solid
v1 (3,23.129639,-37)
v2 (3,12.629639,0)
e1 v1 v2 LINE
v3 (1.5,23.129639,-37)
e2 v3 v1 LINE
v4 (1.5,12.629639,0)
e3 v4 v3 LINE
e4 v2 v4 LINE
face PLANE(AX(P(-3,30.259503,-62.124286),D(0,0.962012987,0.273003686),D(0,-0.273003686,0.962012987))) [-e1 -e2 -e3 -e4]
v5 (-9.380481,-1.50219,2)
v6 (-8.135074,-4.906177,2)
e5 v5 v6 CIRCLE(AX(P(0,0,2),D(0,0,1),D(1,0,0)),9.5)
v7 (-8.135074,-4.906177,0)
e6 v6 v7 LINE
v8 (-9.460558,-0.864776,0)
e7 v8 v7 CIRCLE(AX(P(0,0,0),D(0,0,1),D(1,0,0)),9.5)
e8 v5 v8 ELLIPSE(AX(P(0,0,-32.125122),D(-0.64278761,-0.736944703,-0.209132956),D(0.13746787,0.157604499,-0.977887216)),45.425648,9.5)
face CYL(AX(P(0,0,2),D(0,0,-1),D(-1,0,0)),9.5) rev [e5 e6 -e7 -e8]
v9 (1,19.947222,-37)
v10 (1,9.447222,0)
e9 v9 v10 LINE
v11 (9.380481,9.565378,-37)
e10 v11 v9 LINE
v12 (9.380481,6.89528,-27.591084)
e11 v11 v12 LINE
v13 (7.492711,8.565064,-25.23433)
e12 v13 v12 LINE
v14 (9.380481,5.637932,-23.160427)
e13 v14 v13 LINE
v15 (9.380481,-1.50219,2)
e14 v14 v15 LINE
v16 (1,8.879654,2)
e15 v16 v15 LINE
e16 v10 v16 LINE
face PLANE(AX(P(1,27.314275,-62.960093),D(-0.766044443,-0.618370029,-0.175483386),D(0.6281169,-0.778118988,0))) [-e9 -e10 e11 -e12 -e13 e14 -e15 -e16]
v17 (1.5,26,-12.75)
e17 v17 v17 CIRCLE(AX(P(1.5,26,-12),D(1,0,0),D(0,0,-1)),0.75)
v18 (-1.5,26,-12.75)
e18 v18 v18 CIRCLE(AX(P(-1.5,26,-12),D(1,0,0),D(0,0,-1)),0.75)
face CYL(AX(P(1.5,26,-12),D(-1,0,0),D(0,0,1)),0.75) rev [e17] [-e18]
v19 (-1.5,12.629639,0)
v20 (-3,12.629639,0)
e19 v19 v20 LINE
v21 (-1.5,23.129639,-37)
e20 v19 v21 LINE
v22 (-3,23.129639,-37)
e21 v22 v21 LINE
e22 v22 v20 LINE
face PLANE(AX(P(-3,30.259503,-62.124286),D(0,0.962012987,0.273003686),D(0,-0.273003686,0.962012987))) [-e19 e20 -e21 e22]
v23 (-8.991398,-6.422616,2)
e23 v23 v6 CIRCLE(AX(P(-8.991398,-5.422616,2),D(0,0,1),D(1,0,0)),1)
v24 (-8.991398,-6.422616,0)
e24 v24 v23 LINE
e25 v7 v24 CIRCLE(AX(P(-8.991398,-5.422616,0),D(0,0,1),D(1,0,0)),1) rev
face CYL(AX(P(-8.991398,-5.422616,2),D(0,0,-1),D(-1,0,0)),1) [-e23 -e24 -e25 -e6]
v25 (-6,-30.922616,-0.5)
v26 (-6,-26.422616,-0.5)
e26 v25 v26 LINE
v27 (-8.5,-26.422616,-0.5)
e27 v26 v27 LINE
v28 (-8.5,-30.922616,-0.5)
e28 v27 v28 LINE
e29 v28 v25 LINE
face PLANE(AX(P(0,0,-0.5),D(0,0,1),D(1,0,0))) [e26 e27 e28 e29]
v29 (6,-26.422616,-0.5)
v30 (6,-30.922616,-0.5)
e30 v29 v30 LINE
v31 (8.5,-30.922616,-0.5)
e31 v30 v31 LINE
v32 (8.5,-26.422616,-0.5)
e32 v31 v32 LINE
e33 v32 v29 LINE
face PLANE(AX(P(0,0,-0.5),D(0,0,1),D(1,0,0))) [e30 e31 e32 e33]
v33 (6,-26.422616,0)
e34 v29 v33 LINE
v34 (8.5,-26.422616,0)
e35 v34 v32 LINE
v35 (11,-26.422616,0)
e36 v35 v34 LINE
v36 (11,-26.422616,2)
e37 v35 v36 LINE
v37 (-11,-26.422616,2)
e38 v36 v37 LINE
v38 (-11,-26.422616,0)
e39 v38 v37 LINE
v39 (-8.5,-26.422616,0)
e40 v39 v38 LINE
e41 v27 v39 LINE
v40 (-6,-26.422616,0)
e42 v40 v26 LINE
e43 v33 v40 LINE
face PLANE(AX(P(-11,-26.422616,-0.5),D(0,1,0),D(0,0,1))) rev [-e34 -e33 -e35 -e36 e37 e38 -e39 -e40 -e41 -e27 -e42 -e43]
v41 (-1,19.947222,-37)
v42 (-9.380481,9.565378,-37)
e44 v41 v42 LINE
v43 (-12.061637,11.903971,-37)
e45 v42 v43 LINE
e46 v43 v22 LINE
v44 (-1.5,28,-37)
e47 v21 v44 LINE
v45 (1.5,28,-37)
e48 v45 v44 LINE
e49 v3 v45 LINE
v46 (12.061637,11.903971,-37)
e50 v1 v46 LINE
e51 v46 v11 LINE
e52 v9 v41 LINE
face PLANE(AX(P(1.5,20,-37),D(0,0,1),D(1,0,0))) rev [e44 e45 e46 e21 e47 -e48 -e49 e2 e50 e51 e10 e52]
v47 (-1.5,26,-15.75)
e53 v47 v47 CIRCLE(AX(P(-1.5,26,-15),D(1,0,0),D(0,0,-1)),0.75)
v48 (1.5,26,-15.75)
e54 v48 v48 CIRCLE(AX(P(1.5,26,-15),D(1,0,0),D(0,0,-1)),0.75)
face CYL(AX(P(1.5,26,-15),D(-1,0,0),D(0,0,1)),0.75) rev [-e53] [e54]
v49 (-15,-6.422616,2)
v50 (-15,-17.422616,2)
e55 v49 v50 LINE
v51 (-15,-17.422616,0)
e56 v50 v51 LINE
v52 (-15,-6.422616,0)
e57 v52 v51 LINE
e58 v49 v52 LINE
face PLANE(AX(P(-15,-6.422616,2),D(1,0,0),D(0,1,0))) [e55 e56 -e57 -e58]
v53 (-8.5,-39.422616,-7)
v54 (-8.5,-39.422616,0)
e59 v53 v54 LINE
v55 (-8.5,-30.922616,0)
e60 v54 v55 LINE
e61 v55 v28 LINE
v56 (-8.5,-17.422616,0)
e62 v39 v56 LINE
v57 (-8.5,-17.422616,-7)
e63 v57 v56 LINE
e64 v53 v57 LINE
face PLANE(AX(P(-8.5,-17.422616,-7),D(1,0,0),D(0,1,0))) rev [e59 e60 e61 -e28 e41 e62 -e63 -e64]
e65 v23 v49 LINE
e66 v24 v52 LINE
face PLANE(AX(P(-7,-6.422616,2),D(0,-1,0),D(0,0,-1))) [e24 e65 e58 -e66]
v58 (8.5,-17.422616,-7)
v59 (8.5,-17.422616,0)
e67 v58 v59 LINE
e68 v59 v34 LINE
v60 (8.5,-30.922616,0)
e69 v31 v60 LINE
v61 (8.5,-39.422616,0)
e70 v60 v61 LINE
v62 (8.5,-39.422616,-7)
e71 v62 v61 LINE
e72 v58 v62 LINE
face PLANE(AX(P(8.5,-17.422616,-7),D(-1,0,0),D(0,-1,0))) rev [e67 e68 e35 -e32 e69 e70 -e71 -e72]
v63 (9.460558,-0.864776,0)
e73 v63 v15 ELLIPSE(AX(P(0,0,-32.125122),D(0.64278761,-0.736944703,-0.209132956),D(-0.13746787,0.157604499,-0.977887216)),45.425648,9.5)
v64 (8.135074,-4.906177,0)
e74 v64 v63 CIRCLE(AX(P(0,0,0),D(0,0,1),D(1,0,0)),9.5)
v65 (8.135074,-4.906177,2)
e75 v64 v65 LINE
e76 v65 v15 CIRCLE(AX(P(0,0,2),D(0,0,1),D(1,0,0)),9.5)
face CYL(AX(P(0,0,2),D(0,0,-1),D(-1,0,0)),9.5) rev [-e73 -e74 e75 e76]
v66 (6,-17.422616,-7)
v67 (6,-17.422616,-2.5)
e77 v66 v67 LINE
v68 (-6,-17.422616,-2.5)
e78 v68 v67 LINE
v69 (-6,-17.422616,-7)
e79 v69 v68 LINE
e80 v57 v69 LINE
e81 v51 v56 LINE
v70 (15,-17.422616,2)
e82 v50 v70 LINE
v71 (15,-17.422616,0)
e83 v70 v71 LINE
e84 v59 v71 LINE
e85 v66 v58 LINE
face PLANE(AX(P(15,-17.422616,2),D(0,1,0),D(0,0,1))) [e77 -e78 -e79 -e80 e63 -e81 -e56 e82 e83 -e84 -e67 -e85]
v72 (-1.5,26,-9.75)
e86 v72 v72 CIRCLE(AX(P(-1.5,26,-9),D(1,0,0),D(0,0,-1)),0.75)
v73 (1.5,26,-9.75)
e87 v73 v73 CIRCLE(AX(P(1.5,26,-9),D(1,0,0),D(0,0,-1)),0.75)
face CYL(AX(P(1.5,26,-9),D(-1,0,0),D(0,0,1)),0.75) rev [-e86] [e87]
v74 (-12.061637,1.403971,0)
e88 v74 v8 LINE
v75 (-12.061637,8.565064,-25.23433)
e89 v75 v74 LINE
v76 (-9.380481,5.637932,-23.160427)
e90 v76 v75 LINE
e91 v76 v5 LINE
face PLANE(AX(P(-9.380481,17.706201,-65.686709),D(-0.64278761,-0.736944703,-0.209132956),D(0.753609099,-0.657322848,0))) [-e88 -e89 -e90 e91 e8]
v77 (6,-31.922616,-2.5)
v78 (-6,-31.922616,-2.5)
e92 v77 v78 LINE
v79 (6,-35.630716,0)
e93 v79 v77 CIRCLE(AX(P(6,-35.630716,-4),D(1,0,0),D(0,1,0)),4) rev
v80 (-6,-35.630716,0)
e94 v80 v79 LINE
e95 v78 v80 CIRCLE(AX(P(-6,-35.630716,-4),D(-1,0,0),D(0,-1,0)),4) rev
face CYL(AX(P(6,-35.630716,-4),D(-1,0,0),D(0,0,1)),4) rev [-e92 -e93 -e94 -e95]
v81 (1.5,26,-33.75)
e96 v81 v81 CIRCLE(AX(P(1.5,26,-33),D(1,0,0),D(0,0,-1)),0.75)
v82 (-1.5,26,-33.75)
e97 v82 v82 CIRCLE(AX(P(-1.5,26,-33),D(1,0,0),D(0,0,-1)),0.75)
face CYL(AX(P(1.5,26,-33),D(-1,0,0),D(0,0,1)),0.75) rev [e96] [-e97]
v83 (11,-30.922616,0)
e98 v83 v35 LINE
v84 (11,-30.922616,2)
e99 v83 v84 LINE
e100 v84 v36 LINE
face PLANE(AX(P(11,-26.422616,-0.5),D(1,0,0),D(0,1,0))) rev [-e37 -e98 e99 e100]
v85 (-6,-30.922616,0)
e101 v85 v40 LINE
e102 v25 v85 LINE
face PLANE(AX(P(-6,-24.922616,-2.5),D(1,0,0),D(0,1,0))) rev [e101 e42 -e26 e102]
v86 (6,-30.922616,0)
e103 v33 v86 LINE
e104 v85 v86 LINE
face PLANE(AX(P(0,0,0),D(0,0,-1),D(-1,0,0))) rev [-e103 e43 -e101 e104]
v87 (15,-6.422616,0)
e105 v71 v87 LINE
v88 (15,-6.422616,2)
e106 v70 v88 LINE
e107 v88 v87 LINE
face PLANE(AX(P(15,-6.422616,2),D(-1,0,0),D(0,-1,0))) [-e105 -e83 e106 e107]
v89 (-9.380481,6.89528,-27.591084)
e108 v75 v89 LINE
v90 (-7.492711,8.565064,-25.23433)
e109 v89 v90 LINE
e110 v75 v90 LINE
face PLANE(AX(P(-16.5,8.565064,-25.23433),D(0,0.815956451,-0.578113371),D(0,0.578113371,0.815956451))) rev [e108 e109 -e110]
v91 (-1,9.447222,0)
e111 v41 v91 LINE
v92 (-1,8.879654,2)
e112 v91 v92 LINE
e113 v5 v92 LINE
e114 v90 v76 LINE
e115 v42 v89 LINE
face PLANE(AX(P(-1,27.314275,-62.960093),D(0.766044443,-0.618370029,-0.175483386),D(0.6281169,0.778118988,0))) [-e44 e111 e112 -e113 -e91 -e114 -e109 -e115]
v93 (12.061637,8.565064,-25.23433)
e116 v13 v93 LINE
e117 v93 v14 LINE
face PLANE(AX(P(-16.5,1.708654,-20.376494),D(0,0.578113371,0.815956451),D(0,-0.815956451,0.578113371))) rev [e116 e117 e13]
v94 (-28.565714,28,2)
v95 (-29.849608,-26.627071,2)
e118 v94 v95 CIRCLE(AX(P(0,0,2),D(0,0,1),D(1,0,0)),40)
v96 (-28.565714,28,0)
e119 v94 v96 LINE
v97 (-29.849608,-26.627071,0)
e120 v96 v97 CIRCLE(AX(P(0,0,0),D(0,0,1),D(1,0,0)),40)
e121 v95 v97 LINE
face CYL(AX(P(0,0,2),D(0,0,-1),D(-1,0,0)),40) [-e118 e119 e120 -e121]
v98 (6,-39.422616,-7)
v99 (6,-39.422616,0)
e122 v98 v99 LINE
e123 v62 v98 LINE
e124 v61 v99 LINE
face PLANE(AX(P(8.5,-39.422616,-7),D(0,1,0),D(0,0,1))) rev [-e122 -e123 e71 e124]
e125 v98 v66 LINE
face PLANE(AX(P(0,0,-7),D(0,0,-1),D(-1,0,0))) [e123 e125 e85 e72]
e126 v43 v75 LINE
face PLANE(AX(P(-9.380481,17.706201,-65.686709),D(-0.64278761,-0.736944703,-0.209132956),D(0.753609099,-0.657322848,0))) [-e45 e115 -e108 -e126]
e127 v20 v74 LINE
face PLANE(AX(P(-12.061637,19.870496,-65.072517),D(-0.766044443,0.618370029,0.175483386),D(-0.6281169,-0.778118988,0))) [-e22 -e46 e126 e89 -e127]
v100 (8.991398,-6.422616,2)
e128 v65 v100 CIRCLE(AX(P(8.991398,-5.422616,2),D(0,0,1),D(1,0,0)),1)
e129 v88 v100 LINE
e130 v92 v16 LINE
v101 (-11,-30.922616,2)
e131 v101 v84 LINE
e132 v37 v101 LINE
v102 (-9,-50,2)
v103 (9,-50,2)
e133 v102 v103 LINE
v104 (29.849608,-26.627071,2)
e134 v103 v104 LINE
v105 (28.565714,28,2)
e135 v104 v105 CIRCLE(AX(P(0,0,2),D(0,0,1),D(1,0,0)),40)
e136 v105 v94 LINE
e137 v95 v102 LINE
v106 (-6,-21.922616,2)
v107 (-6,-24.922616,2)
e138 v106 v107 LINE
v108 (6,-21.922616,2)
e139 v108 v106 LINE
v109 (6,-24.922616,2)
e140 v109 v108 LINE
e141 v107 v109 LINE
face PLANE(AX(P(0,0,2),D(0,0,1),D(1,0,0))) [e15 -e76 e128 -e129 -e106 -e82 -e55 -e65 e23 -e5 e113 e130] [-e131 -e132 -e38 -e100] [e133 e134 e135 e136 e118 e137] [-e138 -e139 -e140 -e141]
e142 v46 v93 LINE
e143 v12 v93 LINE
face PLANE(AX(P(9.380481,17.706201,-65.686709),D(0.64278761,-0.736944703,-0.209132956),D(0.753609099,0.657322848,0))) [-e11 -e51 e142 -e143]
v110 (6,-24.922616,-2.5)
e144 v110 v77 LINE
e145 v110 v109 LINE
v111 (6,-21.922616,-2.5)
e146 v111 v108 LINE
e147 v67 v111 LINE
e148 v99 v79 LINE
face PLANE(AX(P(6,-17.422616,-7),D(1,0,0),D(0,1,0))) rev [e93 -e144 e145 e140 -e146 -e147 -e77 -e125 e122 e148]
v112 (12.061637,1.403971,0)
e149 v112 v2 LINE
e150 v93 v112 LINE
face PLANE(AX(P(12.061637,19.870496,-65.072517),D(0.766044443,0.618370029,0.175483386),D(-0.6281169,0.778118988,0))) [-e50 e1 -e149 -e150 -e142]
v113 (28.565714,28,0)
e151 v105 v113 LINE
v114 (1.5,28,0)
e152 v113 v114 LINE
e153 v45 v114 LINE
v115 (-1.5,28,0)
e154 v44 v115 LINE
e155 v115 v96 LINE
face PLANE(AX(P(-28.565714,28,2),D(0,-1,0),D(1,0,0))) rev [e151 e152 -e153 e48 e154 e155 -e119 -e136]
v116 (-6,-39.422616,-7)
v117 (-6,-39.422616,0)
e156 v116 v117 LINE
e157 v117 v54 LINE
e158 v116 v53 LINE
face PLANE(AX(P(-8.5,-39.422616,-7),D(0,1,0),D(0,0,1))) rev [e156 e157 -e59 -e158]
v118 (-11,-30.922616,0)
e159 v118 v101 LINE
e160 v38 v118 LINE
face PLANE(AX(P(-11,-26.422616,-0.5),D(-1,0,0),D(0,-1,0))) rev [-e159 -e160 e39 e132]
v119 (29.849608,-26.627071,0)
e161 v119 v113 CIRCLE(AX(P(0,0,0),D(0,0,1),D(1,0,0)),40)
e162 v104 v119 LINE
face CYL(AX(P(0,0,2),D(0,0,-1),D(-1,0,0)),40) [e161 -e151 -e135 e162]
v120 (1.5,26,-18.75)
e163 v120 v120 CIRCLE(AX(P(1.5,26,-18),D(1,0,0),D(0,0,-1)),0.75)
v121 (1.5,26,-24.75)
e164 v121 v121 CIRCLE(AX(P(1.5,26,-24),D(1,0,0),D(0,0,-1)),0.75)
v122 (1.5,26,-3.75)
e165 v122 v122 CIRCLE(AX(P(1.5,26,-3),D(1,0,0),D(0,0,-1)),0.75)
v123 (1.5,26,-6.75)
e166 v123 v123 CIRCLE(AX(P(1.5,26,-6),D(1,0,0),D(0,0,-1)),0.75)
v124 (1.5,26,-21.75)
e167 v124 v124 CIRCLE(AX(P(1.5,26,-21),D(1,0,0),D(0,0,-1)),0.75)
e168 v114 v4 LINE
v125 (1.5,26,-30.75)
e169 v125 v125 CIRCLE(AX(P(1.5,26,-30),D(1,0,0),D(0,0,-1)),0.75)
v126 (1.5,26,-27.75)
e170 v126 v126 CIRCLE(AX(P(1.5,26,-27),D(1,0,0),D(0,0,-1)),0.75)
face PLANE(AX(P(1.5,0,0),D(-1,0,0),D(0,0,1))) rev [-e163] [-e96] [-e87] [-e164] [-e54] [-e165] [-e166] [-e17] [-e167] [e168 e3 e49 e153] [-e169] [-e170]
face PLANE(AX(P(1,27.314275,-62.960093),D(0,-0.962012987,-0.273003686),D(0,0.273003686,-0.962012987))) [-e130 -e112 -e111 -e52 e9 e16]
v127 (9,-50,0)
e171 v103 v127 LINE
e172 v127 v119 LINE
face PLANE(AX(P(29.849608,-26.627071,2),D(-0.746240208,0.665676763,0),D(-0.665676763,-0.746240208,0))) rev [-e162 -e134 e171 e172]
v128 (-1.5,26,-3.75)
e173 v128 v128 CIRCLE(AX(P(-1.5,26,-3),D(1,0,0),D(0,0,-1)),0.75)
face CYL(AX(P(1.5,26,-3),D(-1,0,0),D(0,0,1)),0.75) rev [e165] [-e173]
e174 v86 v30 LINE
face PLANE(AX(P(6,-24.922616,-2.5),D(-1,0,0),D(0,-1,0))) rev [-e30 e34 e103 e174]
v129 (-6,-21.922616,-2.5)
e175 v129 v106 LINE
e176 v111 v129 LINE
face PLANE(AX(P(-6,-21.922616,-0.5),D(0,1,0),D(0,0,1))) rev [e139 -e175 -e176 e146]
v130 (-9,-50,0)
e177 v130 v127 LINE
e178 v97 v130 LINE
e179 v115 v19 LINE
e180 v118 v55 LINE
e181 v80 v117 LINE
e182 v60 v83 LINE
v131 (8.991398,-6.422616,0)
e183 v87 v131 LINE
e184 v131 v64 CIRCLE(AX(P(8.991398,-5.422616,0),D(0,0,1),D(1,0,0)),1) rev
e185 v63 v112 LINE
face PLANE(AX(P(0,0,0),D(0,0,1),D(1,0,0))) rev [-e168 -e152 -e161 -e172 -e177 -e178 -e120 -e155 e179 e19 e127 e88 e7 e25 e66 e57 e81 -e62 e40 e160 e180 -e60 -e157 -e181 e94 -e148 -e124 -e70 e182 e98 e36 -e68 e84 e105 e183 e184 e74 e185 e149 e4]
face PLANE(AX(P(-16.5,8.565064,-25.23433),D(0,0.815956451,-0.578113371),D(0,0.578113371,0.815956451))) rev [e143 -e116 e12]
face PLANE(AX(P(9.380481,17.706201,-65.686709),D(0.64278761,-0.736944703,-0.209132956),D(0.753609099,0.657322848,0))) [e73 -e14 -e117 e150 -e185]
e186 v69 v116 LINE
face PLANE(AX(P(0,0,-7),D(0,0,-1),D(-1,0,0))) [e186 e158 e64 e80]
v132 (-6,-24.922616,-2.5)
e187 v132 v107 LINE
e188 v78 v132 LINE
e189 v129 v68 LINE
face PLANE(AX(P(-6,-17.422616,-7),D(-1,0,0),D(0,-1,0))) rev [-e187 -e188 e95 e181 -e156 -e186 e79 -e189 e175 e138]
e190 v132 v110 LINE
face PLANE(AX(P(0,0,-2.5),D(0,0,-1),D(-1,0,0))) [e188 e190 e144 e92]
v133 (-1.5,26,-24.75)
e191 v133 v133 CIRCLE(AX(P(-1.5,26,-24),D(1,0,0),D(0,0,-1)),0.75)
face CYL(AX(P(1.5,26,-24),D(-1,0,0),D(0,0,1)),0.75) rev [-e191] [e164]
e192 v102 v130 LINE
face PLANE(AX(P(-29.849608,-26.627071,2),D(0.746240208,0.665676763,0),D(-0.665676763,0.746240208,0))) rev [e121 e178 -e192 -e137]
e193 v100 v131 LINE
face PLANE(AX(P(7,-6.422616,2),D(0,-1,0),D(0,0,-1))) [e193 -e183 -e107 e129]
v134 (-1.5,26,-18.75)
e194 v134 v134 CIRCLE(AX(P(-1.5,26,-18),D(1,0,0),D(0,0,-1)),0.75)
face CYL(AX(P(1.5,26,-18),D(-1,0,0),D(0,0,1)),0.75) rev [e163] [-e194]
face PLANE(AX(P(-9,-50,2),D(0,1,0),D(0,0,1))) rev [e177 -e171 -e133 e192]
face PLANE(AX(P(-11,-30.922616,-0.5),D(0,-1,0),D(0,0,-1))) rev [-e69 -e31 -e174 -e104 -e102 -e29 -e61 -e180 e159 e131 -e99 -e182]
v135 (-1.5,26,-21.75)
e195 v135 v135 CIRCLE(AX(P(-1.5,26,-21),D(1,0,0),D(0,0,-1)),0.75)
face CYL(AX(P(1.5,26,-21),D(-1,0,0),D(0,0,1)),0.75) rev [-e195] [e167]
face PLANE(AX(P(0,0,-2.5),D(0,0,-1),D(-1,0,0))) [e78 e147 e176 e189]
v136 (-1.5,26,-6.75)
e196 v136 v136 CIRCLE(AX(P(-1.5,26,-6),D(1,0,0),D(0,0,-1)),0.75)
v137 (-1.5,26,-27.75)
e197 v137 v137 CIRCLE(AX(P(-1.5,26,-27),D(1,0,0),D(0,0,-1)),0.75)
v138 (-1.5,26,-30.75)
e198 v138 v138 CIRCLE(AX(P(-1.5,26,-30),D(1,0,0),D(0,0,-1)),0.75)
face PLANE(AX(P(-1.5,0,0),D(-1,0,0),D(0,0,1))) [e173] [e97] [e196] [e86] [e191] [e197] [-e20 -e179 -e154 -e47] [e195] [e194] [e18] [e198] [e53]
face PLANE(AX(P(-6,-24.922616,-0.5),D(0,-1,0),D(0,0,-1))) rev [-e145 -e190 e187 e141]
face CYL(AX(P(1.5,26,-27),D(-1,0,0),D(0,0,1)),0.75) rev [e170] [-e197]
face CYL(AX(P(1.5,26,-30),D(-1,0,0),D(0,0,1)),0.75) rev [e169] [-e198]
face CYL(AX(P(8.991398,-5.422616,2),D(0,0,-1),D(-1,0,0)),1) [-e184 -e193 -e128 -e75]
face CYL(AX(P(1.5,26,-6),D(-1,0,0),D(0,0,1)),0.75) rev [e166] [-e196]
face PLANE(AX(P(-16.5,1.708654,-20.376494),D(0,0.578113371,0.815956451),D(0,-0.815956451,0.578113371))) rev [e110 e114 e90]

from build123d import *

# Parameters (mm, degrees)
BOSS_EXTRUDE1_DEPTH             = 2
SKETCH2_R                       = 0.75
BOSS_EXTRUDE2_DEPTH             = 1.5
BOSS_EXTRUDE3_REACH             = 75.225
BOSS_EXTRUDE3_DIRECTION_2_REACH = 75.225
CUT_EXTRUDE1_DEPTH              = 16.5
SKETCH5_W                       = 2.5
SKETCH5_H                       = 22
BOSS_EXTRUDE4_DEPTH             = 7
SKETCH6_W                       = 12
SKETCH6_H                       = 3
SKETCH6_W_2                     = 22
SKETCH6_H_2                     = 4.5
CUT_EXTRUDE2_DEPTH              = 2.5
SKETCH7_W                       = 12
SKETCH7_H                       = 7
SKETCH7_H_2                     = 4.5
BOSS_EXTRUDE5_DEPTH             = 2.5
FILLET1_R                       = 4
FILLET2_R                       = 1


with BuildPart() as part:
    # Sketch1 → Boss-Extrude1 (new body)
    with BuildSketch(Plane.XY):
        with BuildLine():
            Line((-28.565713714, 28), (28.565713714, 28))
            ThreePointArc((28.565713714, 28), (39.988956848, 0.93985647), (29.849608312, -26.627070504))
            Line((29.849608312, -26.627070504), (9, -50))
            Line((9, -50), (-9, -50))
            Line((-9, -50), (-29.849608312, -26.627070504))
            ThreePointArc((-29.849608312, -26.627070504), (-39.988956848, 0.93985647), (-28.565713714, 28))
        make_face()
        with BuildLine():
            Line((7, -6.422616289), (15, -6.422616289))
            Line((15, -6.422616289), (15, -17.422616289))
            Line((15, -17.422616289), (-15, -17.422616289))
            Line((-15, -17.422616289), (-15, -6.422616289))
            Line((-15, -6.422616289), (-7, -6.422616289))
            ThreePointArc((-7, -6.422616289), (0, 9.5), (7, -6.422616289))
        make_face(mode=Mode.SUBTRACT)
    extrude(amount=BOSS_EXTRUDE1_DEPTH)

    # Sketch2 → Boss-Extrude2 (add, symmetric)
    with BuildSketch(Plane(origin=(0, 0, 0), x_dir=(0, 0, -1), z_dir=(1, 0, 0))):
        Polygon((0, 9.5), (37, 20), (37, 28), (0, 28), align=None)
        with Locations((3, 26)):
            Circle(SKETCH2_R, mode=Mode.SUBTRACT)
        with Locations((6, 26)):
            Circle(SKETCH2_R, mode=Mode.SUBTRACT)
        with Locations((9, 26)):
            Circle(SKETCH2_R, mode=Mode.SUBTRACT)
        with Locations((12, 26)):
            Circle(SKETCH2_R, mode=Mode.SUBTRACT)
        with Locations((15, 26)):
            Circle(SKETCH2_R, mode=Mode.SUBTRACT)
        with Locations((18, 26)):
            Circle(SKETCH2_R, mode=Mode.SUBTRACT)
        with Locations((21, 26)):
            Circle(SKETCH2_R, mode=Mode.SUBTRACT)
        with Locations((24, 26)):
            Circle(SKETCH2_R, mode=Mode.SUBTRACT)
        with Locations((27, 26)):
            Circle(SKETCH2_R, mode=Mode.SUBTRACT)
        with Locations((30, 26)):
            Circle(SKETCH2_R, mode=Mode.SUBTRACT)
        with Locations((33, 26)):
            Circle(SKETCH2_R, mode=Mode.SUBTRACT)
    extrude(amount=BOSS_EXTRUDE2_DEPTH, both=True)

    # Boss-Extrude3: up to this plane
    boss_extrude3_end = Plane(origin=(1.5, 20, -37), z_dir=(0, 0, 1))
    # Sketch3 → Boss-Extrude3 (add, up to the surface)
    with BuildSketch(Plane(origin=(0, 0.708044617, -2.495014365), x_dir=(1, 0, 0), z_dir=(0, -0.27300368557463345, 0.9620129872629926)), mode=Mode.PRIVATE) as boss_extrude3_sk1:
        Polygon((1, 9.088350078), (-1, 9.088350078), (-9.380481154, -0.899118445), (-12.061636705, 1.350638189), (-3, 12.149876287), (3, 12.149876287), (12.061636705, 1.350638189), (9.380481154, -0.899118445), align=None)
    boss_extrude3_tool1 = split(extrude(boss_extrude3_sk1.sketch, amount=-BOSS_EXTRUDE3_REACH, mode=Mode.PRIVATE), bisect_by=boss_extrude3_end, keep=Keep.BOTH, mode=Mode.PRIVATE)
    add(boss_extrude3_tool1.solids().sort_by_distance((0, 9.715001, 0.061014))[0])

    # Boss-Extrude3 direction 2: up to this plane
    boss_extrude3_direction_2_end = Plane(origin=(0, 0, 2), z_dir=(0, 0, 1))
    # Sketch3 → Boss-Extrude3 direction 2 (add, up to the surface)
    with BuildSketch(Plane(origin=(0, 0.708044617, -2.495014365), x_dir=(1, 0, 0), z_dir=(0, -0.27300368557463345, 0.9620129872629926)), mode=Mode.PRIVATE) as boss_extrude3_direction_2_sk1:
        Polygon((1, 9.088350078), (-1, 9.088350078), (-9.380481154, -0.899118445), (-12.061636705, 1.350638189), (-3, 12.149876287), (3, 12.149876287), (12.061636705, 1.350638189), (9.380481154, -0.899118445), align=None)
    boss_extrude3_direction_2_tool1 = split(extrude(boss_extrude3_direction_2_sk1.sketch, amount=BOSS_EXTRUDE3_DIRECTION_2_REACH, mode=Mode.PRIVATE), bisect_by=boss_extrude3_direction_2_end, keep=Keep.BOTH, mode=Mode.PRIVATE)
    add(boss_extrude3_direction_2_tool1.solids().sort_by_distance((0, 9.715001, 0.061014))[0])

    # Sketch4 → Cut-Extrude1 (cut, symmetric)
    with BuildSketch(Plane(origin=(0, 0, 0), x_dir=(0, 0, -1), z_dir=(1, 0, 0))):
        Polygon((20.376494071, 1.70865423), (25.234329822, 8.565064446), (31.144411196, 4.377712218), align=None)
    extrude(amount=CUT_EXTRUDE1_DEPTH, both=True, mode=Mode.SUBTRACT)

    # Sketch5 → Boss-Extrude4 (add)
    with BuildSketch(Plane(origin=(0, 0, 0), x_dir=(-1, 0, 0), z_dir=(0, 0, -1))):
        with Locations((-7.25, -28.422616289)):
            Rectangle(SKETCH5_W, SKETCH5_H)
        with Locations((7.25, -28.422616289)):
            Rectangle(SKETCH5_W, SKETCH5_H)
    extrude(amount=BOSS_EXTRUDE4_DEPTH)

    # Sketch6 → Cut-Extrude2 (cut)
    with BuildSketch(Plane.XY.offset(2)):
        with Locations((0, -23.422616289)):
            Rectangle(SKETCH6_W, SKETCH6_H)
        with Locations((0, -28.672616289)):
            Rectangle(SKETCH6_W_2, SKETCH6_H_2)
    extrude(amount=-CUT_EXTRUDE2_DEPTH, mode=Mode.SUBTRACT)

    # Sketch7 → Boss-Extrude5 (add)
    with BuildSketch(Plane(origin=(0, 0, 0), x_dir=(-1, 0, 0), z_dir=(0, 0, -1))):
        with Locations((0, -28.422616289)):
            Rectangle(SKETCH7_W, SKETCH7_H)
        with Locations((0, -19.672616289)):
            Rectangle(SKETCH7_W, SKETCH7_H_2)
    extrude(amount=BOSS_EXTRUDE5_DEPTH)

    # Fillet1
    # the kernel refuses this fillet: 4 mm, written as the material it adds along each edge
    with BuildSketch(Plane(origin=(-6, -31.922616289, 0), x_dir=(0, 0, -1), z_dir=(1, 0, 0))) as fillet1_piece_1:
        with BuildLine():
            CenterArc((4, -3.708099244), FILLET1_R, 112.024312837, 67.975687163)
            Line((0, -3.708099244), (-0.08, -3.708099244))
            Line((-0.08, -3.708099244), (-0.08, 0))
            Line((-0.08, 0), (0, 0.08))
            ThreePointArc((0, 0.08), (1.25, 0.08), (2.47, 0.074161985))
            Line((2.47, 0.074161985), (2.5, 0))
        make_face()
    extrude(amount=12)

    # Fillet2
    fillet2_edges = [part.edges().sort_by_distance(p)[0] for p in [
        (7, -6.422616289, 1),
        (-7, -6.422616289, 1),
    ]]
    fillet(fillet2_edges, radius=FILLET2_R)


solid = part.part
